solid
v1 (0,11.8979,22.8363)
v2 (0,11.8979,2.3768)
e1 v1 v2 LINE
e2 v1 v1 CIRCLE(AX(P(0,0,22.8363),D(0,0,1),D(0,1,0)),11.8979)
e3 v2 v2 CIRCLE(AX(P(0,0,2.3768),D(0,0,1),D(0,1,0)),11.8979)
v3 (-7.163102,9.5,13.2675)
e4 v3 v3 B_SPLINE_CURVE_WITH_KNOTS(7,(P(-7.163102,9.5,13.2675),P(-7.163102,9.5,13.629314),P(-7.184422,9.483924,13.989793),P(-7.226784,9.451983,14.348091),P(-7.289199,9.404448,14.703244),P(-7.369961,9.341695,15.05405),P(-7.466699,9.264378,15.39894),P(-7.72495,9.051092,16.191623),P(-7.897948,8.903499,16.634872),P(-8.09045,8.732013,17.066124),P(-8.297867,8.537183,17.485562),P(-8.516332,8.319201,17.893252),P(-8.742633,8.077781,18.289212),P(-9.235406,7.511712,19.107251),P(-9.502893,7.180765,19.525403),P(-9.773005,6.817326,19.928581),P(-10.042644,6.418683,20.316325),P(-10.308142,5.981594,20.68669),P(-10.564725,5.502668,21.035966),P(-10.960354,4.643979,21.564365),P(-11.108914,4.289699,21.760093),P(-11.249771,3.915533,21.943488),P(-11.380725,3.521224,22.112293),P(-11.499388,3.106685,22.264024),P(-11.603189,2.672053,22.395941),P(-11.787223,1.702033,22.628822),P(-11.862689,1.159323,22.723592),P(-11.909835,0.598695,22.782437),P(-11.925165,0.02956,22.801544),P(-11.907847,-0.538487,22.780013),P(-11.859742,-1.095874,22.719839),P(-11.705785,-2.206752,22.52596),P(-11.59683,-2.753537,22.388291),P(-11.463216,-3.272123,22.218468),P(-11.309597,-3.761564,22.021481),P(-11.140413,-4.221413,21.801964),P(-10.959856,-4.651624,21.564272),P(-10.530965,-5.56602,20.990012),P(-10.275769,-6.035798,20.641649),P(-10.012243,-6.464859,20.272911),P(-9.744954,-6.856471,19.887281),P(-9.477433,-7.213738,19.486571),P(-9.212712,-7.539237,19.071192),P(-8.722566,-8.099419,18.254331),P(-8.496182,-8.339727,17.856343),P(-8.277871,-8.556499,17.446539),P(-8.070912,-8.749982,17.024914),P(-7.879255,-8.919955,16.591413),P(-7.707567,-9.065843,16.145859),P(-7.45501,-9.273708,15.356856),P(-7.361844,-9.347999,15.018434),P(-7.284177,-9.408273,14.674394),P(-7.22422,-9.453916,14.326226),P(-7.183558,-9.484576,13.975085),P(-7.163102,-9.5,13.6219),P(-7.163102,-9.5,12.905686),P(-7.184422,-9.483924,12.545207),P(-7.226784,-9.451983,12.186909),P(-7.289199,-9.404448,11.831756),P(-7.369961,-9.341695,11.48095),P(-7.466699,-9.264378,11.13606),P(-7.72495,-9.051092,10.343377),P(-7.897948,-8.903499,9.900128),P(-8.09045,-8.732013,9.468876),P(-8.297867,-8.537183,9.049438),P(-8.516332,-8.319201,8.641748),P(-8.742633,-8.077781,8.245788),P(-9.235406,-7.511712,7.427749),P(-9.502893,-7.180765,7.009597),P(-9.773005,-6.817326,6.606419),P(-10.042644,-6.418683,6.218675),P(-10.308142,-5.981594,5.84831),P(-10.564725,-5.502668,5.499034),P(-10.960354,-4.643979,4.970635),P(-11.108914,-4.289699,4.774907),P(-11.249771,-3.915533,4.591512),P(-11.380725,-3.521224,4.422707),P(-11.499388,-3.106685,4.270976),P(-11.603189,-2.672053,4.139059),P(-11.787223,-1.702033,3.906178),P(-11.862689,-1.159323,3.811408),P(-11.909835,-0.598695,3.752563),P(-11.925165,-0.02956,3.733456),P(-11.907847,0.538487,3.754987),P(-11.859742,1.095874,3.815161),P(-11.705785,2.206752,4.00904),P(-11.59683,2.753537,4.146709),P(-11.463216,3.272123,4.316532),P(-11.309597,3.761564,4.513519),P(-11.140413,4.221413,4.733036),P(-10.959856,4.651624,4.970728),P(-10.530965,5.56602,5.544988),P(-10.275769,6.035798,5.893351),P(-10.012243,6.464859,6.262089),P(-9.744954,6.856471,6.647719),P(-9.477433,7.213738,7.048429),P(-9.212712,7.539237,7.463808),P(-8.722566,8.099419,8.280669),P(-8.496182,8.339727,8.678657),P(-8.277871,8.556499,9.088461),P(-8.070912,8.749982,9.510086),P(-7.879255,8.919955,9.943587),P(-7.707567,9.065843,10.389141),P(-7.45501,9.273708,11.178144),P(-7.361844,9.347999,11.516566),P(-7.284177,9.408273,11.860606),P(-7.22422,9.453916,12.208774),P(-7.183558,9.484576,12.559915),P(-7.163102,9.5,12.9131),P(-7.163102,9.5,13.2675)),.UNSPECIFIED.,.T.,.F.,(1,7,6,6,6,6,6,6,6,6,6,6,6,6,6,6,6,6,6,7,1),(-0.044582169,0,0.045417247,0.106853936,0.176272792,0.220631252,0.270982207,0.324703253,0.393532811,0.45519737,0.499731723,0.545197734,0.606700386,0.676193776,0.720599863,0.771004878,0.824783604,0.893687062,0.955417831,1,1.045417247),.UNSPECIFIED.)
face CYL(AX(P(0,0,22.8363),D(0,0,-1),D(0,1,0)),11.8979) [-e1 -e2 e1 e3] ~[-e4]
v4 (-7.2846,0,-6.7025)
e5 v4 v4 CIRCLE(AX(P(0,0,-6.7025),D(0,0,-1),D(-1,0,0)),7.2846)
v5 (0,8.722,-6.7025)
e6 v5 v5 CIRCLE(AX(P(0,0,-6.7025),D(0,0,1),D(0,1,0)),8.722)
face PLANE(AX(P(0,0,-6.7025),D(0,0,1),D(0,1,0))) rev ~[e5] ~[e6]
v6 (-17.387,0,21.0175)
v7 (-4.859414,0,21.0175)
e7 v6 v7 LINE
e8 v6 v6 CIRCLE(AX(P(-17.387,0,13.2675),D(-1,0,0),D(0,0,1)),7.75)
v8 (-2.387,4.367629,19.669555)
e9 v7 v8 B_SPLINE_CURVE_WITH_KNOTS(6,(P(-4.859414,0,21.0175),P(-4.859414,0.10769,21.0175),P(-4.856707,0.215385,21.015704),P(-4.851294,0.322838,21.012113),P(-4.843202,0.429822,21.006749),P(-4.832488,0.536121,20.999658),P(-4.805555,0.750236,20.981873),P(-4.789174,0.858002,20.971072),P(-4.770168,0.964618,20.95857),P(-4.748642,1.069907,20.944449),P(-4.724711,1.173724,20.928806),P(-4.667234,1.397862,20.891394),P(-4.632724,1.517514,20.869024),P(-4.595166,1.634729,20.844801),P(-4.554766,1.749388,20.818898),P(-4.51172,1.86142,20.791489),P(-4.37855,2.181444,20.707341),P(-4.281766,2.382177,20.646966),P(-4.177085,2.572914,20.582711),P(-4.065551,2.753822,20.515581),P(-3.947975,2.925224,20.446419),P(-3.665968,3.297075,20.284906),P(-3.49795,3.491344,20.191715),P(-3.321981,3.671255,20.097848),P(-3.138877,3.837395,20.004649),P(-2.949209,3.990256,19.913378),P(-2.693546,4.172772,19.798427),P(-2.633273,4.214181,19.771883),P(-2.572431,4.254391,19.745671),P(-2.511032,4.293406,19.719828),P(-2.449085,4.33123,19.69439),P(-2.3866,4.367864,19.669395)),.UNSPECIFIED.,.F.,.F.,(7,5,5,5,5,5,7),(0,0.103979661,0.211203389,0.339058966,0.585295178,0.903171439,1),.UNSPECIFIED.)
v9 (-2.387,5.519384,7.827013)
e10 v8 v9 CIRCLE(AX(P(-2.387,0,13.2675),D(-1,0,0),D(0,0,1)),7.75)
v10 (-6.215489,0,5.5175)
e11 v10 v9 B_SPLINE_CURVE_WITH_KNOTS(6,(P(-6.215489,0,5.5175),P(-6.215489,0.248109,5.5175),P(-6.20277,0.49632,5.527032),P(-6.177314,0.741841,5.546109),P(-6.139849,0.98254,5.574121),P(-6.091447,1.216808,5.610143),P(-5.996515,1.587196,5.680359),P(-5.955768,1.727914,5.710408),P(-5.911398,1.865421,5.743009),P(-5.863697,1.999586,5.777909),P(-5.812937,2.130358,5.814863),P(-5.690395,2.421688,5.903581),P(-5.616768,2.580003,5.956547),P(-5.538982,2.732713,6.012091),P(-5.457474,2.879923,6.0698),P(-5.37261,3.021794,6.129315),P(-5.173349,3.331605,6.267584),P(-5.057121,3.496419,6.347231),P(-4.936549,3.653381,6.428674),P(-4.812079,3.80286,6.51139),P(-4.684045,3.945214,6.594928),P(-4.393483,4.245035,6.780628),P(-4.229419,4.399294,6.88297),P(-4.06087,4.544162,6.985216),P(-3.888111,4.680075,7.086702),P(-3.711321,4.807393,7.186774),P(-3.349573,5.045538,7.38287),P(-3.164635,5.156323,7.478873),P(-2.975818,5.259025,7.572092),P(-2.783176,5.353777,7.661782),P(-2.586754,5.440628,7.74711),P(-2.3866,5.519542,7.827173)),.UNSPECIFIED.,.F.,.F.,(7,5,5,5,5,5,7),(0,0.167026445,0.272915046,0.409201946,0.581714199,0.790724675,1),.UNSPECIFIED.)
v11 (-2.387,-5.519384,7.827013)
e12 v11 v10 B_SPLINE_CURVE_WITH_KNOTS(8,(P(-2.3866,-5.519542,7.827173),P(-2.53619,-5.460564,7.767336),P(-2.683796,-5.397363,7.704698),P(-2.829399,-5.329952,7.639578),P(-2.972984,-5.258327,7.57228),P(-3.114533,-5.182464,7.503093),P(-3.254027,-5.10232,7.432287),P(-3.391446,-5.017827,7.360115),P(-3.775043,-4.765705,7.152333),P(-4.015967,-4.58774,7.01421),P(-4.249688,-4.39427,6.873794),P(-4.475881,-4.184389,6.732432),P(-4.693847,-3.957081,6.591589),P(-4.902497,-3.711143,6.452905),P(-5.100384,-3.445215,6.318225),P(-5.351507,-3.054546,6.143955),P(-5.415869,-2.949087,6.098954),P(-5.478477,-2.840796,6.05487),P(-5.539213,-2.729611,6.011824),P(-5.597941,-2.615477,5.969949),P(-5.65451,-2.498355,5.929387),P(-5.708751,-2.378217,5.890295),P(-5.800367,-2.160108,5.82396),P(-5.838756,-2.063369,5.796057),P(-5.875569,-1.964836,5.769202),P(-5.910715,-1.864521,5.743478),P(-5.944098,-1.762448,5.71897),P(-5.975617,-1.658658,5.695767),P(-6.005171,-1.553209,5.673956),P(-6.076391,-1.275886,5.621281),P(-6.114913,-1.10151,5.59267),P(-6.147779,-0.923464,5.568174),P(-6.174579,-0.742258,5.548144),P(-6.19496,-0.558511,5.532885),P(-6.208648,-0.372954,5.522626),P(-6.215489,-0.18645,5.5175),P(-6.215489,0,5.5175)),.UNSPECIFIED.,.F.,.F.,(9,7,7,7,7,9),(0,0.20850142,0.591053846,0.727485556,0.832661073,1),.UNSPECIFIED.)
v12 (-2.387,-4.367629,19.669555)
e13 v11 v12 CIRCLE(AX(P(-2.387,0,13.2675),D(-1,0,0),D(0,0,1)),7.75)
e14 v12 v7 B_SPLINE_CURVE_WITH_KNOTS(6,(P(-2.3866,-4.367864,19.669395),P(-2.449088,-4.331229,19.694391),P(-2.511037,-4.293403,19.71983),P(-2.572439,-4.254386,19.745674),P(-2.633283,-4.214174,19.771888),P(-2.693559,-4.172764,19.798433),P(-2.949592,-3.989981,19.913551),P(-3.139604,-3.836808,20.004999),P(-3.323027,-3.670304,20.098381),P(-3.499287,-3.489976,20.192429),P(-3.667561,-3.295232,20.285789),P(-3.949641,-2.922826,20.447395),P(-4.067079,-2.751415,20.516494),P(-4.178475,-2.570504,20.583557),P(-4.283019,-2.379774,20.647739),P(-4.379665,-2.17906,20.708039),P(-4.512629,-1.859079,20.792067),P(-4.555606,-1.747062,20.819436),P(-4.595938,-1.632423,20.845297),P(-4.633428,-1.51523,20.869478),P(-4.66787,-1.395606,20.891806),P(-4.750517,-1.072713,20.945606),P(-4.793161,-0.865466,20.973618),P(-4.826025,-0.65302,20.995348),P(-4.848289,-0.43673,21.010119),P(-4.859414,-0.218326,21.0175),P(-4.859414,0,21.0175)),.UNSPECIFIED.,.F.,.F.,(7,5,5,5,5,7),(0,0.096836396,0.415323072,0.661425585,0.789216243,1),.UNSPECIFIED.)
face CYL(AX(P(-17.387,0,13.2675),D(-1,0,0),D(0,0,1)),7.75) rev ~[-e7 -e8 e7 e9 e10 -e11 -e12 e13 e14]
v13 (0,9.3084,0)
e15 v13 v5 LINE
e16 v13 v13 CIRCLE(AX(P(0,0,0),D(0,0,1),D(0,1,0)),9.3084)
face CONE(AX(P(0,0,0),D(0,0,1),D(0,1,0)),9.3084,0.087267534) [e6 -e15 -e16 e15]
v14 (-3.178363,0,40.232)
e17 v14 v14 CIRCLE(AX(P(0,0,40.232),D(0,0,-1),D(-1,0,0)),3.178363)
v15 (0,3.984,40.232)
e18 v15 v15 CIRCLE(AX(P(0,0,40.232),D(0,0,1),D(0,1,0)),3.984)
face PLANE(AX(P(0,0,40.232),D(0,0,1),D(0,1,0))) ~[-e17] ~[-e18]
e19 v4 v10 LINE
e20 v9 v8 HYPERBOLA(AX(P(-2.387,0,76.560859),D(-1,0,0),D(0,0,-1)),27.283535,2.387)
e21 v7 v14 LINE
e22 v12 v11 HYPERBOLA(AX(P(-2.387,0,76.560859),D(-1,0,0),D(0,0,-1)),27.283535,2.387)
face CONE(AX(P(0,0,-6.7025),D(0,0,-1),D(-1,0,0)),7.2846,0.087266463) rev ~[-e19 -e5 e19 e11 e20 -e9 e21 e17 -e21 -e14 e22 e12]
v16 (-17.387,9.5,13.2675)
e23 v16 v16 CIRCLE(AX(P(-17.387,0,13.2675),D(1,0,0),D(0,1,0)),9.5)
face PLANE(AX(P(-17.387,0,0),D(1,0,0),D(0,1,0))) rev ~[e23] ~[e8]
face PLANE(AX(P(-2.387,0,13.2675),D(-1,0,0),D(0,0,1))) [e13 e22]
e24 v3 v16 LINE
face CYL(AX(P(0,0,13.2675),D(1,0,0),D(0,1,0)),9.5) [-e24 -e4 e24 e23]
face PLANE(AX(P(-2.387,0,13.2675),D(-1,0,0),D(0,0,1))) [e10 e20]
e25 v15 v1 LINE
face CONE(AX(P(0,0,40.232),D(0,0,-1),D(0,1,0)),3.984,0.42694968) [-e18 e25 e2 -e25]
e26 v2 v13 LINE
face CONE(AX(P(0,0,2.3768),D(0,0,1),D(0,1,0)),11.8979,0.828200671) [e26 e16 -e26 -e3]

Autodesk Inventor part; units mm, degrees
ref_plane "YZ Plane" through (0, 0, 0) normal (1, 0, 0) x (0, 1, 0)
ref_plane "XZ Plane" through (0, 0, 0) normal (0, 1, 0) x (-1, 0, 0)
sketch "Sketch1" plane through (0, 0, 0) normal (1, 0, 0) x (0, 1, 0)
  line L0 (9.9, 0) -> (6.6104, -37.6)
  line L1 (11, 0) -> (11, -20)
  line L2 (-11, 0) -> (11, 0) projected
  line L3 (8.722, -6.7025) -> (0, -6.7025)
  line L4 (0, -6.7025) -> (0, 40.232)
  line L5 (0, 40.232) -> (3.984, 40.232)
  line L6 (3.984, 40.232) -> (11, 0) construction
  arc A0 (6.0149, 28.5859) -> (5.3277, 32.5264) centre (2.2587, 29.961) ccw construction
  line L7 (3.984, 40.232) -> (11.8979, 22.8363)
  line L8 (11.8979, 22.8363) -> (11.8979, 2.3768)
  line L9 (11.8979, 2.3768) -> (9.3084, 0)
  line L10 (9.3084, 0) -> (8.722, -6.7025)
  point P0 (0, 0)
  dimension "d4" = 4
  dimension "d5" = 4
revolve "Revolution1" add sketch "Sketch1" angle 360 about axis through (0, 0, -6.7025) along (0, 0, 1)
sketch "Sketch2" plane through (0, 0, 0) normal (1, 0, 0) x (0, 1, 0)
  line L0 (-3.984, 40.232) -> (-11.8979, 22.8363) projected
  line L1 (0, 39.9349) -> (0, 14.7253)
  arc A0 (-3.984, 40.232) -> (-3.4864, 41.3256) centre (-5.4716, 41.5688) ccw
  point P0 (0, 0)
  dimension "d7" = 2
sketch "Sketch3" plane through (0, 0, 0) normal (1, 0, 0) x (0, 1, 0)
  circle A0 centre (0, 10) radius 7.21 projected
  circle A1 centre (0, 13.2675) radius 9.5
  point P0 (0, 0)
  dimension "d8" = 19
ref_plane "Work Plane1" through (-17.387, -14.1299, -4.1299) normal (1, 0, 0) x (0, 1, 0)
extrude "Extrusion1" add sketch "Sketch3" against normal up to surface (17.387 mm away) contours A0 A1 | A0 A1 picked at (-1.9464, 7.9731) picked at (-0.0449, 20.8614)
sketch "Sketch4" plane through (-17.387, 0, 13.2675) normal (-1, 0, 0) x (0, 0, 1)
  circle A0 centre (0, 0) radius 9.5 projected
  circle A1 centre (0, 0) radius 7.75
  point P0 (-13.2675, 0)
  dimension "d11" = 15.5
extrude "Extrusion2" cut sketch "Sketch4" against normal blind 15 contours A1
sketch "Sketch5" plane through (0, 0, -6.7025) normal (0, 0, -1) x (-1, 0, 0)
  circle A0 centre (0, 0) radius 9.3084 projected
  circle A1 centre (0, 0) radius 7.2846
  point P0 (0, 0)
extrude "Extrusion3" cut sketch "Sketch5" against normal through all draft -5 contours A1
properties part number "01_Connector_T"
